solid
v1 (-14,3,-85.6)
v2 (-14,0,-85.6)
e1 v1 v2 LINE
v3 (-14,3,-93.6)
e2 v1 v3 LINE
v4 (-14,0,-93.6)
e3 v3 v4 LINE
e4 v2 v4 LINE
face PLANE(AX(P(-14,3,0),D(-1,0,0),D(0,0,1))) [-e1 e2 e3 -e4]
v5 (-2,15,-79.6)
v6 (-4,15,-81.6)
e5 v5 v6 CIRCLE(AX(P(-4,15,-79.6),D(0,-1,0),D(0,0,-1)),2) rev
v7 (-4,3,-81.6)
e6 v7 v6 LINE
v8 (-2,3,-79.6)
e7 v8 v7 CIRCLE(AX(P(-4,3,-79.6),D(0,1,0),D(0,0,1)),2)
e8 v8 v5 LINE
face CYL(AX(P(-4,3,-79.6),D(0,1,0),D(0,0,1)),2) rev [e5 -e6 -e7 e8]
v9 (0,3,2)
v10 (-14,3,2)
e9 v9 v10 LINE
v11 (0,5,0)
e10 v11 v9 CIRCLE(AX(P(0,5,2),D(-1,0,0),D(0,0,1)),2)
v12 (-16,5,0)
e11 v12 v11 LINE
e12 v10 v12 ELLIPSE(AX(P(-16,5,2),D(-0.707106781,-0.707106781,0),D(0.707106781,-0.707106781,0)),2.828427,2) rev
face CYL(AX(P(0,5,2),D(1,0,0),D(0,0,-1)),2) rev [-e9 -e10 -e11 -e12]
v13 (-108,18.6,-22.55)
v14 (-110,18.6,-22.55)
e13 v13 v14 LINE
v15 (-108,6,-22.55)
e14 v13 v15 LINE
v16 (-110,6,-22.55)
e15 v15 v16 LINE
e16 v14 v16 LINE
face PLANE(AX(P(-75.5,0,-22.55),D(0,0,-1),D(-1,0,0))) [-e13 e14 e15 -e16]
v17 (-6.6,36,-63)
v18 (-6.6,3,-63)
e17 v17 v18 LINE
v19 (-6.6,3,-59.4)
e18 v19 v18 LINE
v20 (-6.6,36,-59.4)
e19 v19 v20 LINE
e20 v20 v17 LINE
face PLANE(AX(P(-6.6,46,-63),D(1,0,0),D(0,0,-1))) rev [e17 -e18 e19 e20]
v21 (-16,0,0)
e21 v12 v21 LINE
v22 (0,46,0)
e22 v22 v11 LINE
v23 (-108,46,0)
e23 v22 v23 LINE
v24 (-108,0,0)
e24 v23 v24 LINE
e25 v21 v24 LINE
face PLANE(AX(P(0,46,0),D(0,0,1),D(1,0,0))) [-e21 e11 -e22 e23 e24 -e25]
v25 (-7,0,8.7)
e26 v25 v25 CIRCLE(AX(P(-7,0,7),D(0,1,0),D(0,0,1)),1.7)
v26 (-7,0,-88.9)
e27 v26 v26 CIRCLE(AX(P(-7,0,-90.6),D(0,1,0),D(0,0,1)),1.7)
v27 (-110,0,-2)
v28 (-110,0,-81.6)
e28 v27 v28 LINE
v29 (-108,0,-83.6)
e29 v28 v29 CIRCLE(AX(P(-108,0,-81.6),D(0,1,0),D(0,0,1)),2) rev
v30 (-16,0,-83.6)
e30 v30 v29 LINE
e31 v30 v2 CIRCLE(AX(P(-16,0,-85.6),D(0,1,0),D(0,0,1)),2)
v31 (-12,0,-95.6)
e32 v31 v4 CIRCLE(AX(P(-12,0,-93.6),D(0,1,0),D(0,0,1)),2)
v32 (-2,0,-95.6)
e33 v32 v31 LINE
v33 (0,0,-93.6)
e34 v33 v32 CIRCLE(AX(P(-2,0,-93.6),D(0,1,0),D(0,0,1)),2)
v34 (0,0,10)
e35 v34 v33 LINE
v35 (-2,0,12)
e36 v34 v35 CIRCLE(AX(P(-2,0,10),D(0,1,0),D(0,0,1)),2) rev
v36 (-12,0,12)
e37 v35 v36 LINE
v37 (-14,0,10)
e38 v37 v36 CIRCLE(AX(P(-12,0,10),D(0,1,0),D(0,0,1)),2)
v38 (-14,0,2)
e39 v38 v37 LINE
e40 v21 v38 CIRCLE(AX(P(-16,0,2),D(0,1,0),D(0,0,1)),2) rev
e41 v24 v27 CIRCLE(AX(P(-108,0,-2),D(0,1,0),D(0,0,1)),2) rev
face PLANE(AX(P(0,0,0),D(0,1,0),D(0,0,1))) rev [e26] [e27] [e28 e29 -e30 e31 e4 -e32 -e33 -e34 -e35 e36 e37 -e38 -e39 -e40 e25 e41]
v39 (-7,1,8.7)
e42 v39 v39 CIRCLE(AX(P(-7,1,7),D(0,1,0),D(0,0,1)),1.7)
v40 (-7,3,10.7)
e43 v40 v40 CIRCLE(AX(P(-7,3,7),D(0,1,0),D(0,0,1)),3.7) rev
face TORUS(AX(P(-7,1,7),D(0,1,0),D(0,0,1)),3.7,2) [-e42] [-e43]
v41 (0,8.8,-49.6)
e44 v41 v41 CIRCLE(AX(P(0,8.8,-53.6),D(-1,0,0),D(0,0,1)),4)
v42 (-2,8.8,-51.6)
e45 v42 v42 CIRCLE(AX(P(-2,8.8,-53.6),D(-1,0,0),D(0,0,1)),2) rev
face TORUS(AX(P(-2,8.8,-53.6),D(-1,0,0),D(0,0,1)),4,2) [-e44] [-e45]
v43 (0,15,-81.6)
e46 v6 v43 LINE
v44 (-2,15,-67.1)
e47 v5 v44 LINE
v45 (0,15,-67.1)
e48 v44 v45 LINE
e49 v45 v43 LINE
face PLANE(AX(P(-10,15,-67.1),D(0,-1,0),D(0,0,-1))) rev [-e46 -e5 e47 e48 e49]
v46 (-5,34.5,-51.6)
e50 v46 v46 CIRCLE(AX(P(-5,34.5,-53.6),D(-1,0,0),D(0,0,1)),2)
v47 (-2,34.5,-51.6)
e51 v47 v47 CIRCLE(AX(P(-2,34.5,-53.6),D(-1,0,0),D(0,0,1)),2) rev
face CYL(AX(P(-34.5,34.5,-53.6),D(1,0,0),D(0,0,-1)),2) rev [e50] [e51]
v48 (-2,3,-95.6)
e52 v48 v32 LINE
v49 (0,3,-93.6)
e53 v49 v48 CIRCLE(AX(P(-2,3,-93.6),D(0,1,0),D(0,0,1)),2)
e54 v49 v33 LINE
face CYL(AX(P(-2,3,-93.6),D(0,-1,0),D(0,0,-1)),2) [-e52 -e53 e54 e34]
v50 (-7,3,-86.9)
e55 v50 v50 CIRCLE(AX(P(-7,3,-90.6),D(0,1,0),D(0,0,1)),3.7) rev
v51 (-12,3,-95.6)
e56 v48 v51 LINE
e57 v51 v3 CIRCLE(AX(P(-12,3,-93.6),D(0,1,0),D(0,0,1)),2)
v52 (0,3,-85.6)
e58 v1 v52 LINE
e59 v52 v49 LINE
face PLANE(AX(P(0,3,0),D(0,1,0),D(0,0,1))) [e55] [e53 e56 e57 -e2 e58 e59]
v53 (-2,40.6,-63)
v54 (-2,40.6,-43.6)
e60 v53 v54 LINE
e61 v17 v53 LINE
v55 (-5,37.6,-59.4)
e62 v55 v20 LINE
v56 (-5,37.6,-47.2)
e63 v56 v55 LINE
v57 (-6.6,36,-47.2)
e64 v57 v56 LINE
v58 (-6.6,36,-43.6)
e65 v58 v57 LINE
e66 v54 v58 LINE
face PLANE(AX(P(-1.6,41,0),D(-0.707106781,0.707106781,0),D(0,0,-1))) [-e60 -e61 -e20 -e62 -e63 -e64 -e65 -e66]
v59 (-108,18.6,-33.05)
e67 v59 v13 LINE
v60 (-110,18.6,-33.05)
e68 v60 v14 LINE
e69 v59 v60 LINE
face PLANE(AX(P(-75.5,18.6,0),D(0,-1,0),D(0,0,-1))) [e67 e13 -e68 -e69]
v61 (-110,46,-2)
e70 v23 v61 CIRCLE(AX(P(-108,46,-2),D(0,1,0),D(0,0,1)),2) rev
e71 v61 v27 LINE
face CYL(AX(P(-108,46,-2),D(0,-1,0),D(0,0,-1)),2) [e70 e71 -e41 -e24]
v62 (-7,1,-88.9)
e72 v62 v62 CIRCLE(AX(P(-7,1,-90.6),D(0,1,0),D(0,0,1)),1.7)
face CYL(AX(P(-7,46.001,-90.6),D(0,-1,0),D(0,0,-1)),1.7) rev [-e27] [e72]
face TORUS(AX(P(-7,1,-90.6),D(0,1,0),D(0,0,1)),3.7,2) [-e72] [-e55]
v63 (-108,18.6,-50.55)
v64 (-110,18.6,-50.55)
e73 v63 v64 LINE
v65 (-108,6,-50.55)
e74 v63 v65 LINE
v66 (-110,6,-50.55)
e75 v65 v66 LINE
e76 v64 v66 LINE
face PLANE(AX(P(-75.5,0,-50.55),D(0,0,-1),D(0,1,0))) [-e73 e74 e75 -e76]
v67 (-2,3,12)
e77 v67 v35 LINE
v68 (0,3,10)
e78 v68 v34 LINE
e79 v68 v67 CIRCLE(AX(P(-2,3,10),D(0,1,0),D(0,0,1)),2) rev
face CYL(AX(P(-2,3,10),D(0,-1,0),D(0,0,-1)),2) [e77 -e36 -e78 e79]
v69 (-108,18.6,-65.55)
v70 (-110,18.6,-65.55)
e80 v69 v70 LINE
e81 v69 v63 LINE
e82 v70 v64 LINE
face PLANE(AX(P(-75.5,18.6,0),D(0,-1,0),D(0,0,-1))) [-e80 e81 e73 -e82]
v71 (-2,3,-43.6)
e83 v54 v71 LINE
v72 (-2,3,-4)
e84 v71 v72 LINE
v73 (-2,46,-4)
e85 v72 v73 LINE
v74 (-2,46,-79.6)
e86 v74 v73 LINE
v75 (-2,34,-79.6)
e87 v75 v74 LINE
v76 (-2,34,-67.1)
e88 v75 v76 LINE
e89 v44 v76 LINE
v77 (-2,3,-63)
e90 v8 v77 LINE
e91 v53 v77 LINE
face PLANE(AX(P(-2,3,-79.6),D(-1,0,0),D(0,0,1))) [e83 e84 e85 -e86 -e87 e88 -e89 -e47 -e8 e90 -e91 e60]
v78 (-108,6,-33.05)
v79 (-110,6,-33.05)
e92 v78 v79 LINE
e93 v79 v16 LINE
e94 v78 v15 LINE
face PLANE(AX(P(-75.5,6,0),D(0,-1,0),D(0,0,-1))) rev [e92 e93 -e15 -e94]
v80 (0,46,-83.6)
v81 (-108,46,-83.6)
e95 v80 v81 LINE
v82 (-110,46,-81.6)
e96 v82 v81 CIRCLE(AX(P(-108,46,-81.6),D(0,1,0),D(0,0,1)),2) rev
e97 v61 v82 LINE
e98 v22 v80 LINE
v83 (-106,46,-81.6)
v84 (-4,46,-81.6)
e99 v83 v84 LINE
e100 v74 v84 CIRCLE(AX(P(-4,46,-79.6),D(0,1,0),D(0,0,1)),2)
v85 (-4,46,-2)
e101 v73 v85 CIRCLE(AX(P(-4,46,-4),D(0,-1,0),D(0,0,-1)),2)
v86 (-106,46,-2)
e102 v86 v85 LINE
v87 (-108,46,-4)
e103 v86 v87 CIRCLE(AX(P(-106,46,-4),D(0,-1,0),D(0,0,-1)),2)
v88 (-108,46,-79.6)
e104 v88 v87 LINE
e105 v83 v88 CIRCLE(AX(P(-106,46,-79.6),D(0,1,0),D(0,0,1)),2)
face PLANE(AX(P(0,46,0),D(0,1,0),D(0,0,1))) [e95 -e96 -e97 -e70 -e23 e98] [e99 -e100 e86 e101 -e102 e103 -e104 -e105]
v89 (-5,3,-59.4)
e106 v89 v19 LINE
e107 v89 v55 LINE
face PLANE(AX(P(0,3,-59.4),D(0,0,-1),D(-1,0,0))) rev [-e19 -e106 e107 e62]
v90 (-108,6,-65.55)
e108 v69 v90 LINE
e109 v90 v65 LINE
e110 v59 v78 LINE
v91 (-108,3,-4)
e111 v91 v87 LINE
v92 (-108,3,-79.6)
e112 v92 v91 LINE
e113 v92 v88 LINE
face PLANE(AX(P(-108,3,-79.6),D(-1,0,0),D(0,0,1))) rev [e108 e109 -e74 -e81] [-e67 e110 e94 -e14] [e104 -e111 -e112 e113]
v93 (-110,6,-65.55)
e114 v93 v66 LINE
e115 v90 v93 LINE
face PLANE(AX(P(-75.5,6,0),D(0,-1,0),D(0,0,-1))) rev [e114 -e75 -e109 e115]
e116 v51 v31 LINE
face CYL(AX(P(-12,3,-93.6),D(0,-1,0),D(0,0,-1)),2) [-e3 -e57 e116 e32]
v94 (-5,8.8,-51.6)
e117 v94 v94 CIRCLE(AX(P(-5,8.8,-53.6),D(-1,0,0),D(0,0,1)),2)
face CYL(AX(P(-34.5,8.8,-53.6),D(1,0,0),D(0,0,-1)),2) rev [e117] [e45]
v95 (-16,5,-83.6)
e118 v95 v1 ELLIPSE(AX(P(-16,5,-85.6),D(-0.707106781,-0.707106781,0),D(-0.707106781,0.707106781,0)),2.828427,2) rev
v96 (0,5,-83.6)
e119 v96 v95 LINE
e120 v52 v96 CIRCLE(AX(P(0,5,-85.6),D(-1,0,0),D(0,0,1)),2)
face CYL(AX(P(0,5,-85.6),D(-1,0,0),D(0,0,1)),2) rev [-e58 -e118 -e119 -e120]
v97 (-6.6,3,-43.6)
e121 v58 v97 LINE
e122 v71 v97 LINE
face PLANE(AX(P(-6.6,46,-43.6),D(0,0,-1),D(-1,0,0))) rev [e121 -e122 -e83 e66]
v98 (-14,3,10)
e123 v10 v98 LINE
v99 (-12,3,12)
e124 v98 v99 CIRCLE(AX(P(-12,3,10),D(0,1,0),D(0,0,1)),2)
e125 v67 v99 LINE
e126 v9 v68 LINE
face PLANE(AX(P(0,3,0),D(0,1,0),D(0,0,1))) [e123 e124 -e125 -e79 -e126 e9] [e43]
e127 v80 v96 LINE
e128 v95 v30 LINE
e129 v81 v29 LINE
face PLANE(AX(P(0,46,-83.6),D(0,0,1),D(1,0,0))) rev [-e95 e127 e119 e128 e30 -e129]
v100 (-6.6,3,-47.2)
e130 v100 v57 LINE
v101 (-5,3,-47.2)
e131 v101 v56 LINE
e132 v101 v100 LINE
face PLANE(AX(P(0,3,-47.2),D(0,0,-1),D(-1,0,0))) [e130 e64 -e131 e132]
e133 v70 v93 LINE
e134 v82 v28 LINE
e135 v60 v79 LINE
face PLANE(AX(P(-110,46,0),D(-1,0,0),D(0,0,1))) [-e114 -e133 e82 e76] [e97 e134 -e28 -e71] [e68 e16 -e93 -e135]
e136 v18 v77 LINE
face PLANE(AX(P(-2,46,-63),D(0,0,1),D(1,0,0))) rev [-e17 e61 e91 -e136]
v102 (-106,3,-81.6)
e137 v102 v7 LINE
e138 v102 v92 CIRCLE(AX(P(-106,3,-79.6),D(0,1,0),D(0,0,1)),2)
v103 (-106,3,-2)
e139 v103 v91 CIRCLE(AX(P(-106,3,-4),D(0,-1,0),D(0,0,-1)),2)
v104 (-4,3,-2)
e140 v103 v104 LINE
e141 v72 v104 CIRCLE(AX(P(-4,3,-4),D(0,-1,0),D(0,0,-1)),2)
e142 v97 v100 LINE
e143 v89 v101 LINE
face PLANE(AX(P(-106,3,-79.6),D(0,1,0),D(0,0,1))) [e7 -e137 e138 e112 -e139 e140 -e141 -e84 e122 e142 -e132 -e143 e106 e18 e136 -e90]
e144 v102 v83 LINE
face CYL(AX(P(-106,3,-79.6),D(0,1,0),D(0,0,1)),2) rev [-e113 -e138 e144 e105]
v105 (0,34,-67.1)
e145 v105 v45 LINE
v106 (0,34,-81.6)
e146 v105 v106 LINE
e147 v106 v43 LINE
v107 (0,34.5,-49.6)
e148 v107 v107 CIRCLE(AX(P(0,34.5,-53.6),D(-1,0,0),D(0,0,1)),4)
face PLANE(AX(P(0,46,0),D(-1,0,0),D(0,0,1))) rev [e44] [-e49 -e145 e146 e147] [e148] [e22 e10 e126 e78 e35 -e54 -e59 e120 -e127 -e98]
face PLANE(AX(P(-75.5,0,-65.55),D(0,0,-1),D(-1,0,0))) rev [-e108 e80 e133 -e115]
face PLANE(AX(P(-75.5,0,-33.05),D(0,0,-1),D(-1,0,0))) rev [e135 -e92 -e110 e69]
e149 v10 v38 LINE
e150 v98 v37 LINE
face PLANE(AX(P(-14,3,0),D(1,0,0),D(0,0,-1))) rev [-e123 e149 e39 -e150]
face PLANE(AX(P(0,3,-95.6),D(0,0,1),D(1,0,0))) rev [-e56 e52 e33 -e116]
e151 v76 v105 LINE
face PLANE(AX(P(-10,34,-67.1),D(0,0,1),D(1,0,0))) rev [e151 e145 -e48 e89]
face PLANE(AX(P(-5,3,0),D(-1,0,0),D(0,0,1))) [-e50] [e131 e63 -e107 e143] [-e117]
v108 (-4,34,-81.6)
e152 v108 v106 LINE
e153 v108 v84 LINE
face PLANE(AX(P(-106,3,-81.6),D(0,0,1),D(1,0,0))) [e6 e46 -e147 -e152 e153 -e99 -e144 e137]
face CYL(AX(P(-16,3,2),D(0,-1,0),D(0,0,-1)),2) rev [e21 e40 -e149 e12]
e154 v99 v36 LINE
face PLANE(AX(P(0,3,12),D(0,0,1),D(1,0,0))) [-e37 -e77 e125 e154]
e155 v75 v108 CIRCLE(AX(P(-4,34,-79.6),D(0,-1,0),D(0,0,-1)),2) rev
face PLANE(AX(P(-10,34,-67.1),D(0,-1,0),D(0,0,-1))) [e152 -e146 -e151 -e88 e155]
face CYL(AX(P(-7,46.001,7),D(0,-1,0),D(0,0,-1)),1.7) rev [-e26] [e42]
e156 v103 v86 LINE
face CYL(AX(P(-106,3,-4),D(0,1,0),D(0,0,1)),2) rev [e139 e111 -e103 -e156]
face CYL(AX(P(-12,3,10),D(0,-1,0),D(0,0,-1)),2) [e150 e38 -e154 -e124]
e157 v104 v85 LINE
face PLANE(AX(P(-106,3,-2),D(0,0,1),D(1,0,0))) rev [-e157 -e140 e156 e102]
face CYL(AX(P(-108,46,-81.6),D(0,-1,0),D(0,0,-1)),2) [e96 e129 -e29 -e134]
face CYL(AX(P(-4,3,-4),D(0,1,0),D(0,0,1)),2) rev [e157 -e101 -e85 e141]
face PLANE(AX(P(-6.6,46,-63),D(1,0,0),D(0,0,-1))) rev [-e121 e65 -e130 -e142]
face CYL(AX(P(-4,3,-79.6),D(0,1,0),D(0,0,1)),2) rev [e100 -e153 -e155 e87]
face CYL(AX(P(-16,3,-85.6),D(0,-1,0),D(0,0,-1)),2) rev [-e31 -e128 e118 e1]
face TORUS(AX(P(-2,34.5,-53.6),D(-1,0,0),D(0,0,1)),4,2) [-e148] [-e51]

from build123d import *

# Parameters (mm, degrees)
BOSS_EXTRUDE1_DEPTH = 46
BOSS_EXTRUDE2_DEPTH = 3
BOSS_EXTRUDE3_DEPTH = 3
FILLET1_R           = 2
FILLET2_R           = 2
CUT_EXTRUDE5_REACH  = 154.825
SKETCH3_R           = 1.7
FILLET3_R           = 2
CUT_EXTRUDE6_DEPTH  = 43
SKETCH5_W           = 4.6
SKETCH5_H           = 19.4
BOSS_EXTRUDE4_DEPTH = 46
SKETCH6_W           = 4.6
SKETCH6_H           = 19.4
CUT_EXTRUDE8_DEPTH  = 5
SKETCH7_W           = 1.6
SKETCH7_H           = 12.2
CUT_EXTRUDE10_DEPTH = 38
CHAMFER1_SIZE       = 5
SKETCH8_R           = 2
CUT_EXTRUDE11_DEPTH = 34.5
FILLET4_R           = 2
SKETCH12_W          = 15
SKETCH12_H          = 12.6
SKETCH12_W_2        = 10.5
CUT_EXTRUDE13_DEPTH = 34.5
SKETCH14_W          = 14.5
SKETCH14_H          = 19
CUT_EXTRUDE14_DEPTH = 10


with BuildPart() as part:
    # Sketch2 → Boss-Extrude1 (new body)
    with BuildSketch(Plane(origin=(0, 0, 0), x_dir=(1, 0, 0), z_dir=(0, 1, 0))):
        with BuildLine():
            ThreePointArc((-110, 81.6), (-109.414213562, 83.014213562), (-108, 83.6))
            Line((-108, 83.6), (-16, 83.6))
            Line((-16, 83.6), (0, 83.6))
            Line((0, 83.6), (0, 0))
            Line((0, 0), (-16, 0))
            Line((-16, 0), (-108, 0))
            ThreePointArc((-108, 0), (-109.414213562, 0.585786438), (-110, 2))
            Line((-110, 2), (-110, 81.6))
        make_face()
    extrude(amount=BOSS_EXTRUDE1_DEPTH)

    # Sketch2<7> → Boss-Extrude2 (add)
    with BuildSketch(Plane(origin=(0, 0, 0), x_dir=(1, 0, 0), z_dir=(0, 1, 0))):
        with BuildLine():
            ThreePointArc((-16, 83.6), (-14.585786438, 84.185786438), (-14, 85.6))
            Line((-14, 85.6), (-14, 93.6))
            ThreePointArc((-14, 93.6), (-13.414213562, 95.014213562), (-12, 95.6))
            Line((-12, 95.6), (-2, 95.6))
            ThreePointArc((-2, 95.6), (-0.585786438, 95.014213562), (0, 93.6))
            Line((0, 93.6), (0, 83.6))
            Line((0, 83.6), (-16, 83.6))
        make_face()
    extrude(amount=BOSS_EXTRUDE2_DEPTH)

    # Sketch2<8> → Boss-Extrude3 (add)
    with BuildSketch(Plane(origin=(0, 0, 0), x_dir=(1, 0, 0), z_dir=(0, 1, 0))):
        with BuildLine():
            ThreePointArc((0, -10), (-0.585786438, -11.414213562), (-2, -12))
            Line((-2, -12), (-12, -12))
            ThreePointArc((-12, -12), (-13.414213562, -11.414213562), (-14, -10))
            Line((-14, -10), (-14, -2))
            ThreePointArc((-14, -2), (-14.585786438, -0.585786438), (-16, 0))
            Line((-16, 0), (0, 0))
            Line((0, 0), (0, -10))
        make_face()
    extrude(amount=BOSS_EXTRUDE3_DEPTH)

    # Fillet1
    fillet1_edges = [part.edges().sort_by_distance(p)[0] for p in [
        (-8, 3, -83.6),
    ]]
    fillet(fillet1_edges, radius=FILLET1_R)

    # Fillet2
    fillet2_edges = [part.edges().sort_by_distance(p)[0] for p in [
        (-8, 3, 0),
    ]]
    fillet(fillet2_edges, radius=FILLET2_R)

    # Sketch3 → Cut-Extrude5 (cut, up to next)
    with BuildSketch(Plane(origin=(0, 0, 0), x_dir=(1, 0, 0), z_dir=(0, 1, 0)), mode=Mode.PRIVATE) as cut_extrude5_sk1:
        with Locations(Location((-7, -7, 0), (0, 0, 270))):
            Circle(SKETCH3_R)
    cut_extrude5_tool1 = extrude(cut_extrude5_sk1.sketch, amount=CUT_EXTRUDE5_REACH, mode=Mode.PRIVATE) & part.part
    # Sketch3 → Cut-Extrude5 (cut, up to next)
    with BuildSketch(Plane(origin=(0, 0, 0), x_dir=(1, 0, 0), z_dir=(0, 1, 0)), mode=Mode.PRIVATE) as cut_extrude5_sk2:
        with Locations(Location((-7, 90.6, 0), (0, 0, 270))):
            Circle(SKETCH3_R)
    cut_extrude5_tool2 = extrude(cut_extrude5_sk2.sketch, amount=CUT_EXTRUDE5_REACH, mode=Mode.PRIVATE) & part.part
    add(cut_extrude5_tool1.solids().sort_by_distance((-7, 0, 7))[0], mode=Mode.SUBTRACT)
    add(cut_extrude5_tool2.solids().sort_by_distance((-7, 0, -90.6))[0], mode=Mode.SUBTRACT)

    # Fillet3
    fillet3_edges = [part.edges().sort_by_distance(p)[0] for p in [
        (-7, 3, -92.3),
        (-7, 3, 5.3),
    ]]
    fillet(fillet3_edges, radius=FILLET3_R)

    # Sketch4 → Cut-Extrude6 (cut)
    with BuildSketch(Plane(origin=(0, 46, 0), x_dir=(1, 0, 0), z_dir=(0, 1, 0))):
        with BuildLine():
            Line((-106, 81.6), (-4, 81.6))
            ThreePointArc((-4, 81.6), (-2.585786438, 81.014213562), (-2, 79.6))
            Line((-2, 79.6), (-2, 4))
            ThreePointArc((-2, 4), (-2.585786438, 2.585786438), (-4, 2))
            Line((-4, 2), (-106, 2))
            ThreePointArc((-106, 2), (-107.414213562, 2.585786438), (-108, 4))
            Line((-108, 4), (-108, 79.6))
            ThreePointArc((-108, 79.6), (-107.414213562, 81.014213562), (-106, 81.6))
        make_face()
    extrude(amount=-CUT_EXTRUDE6_DEPTH, mode=Mode.SUBTRACT)

    # Sketch5 → Boss-Extrude4 (add)
    with BuildSketch(Plane(origin=(0, 0, 0), x_dir=(1, 0, 0), z_dir=(0, 1, 0))):
        with Locations((-4.3, 53.3)):
            Rectangle(SKETCH5_W, SKETCH5_H)
    extrude(amount=BOSS_EXTRUDE4_DEPTH)

    # Sketch6 → Cut-Extrude8 (cut)
    with BuildSketch(Plane(origin=(0, 46, 0), x_dir=(1, 0, 0), z_dir=(0, 1, 0))):
        with Locations((-4.3, 53.3)):
            Rectangle(SKETCH6_W, SKETCH6_H)
    extrude(amount=-CUT_EXTRUDE8_DEPTH, mode=Mode.SUBTRACT)

    # Sketch7 → Cut-Extrude10 (cut)
    with BuildSketch(Plane(origin=(0, 41, 0), x_dir=(1, 0, 0), z_dir=(0, 1, 0))):
        with Locations((-5.8, 53.3)):
            Rectangle(SKETCH7_W, SKETCH7_H)
    extrude(amount=-CUT_EXTRUDE10_DEPTH, mode=Mode.SUBTRACT)

    # Chamfer1
    # the kernel refuses this chamfer: 5 mm, written as the material it takes off along each edge
    with BuildSketch(Plane(origin=(-6.6, 41, -46.54158506), x_dir=(0.9996219169112968, 0.027495876610586317, 0), z_dir=(0, 0, -1))) as chamfer1_piece_1_section:
        Polygon((CHAMFER1_SIZE * 0.999621916911, CHAMFER1_SIZE * 0.0274958766106), (-CHAMFER1_SIZE * 0.0274958766106, CHAMFER1_SIZE * 0.999621916911), (0, 0), align=None)
    chamfer1_piece_1 = extrude(amount=29.31682988, mode=Mode.PRIVATE)
    chamfer1_piece_1 = split(chamfer1_piece_1, bisect_by=Plane(origin=(-2, 39.327890325, -61.2), z_dir=(-1, 0, 0)), keep=Keep.TOP, mode=Mode.PRIVATE)
    add(chamfer1_piece_1, mode=Mode.SUBTRACT)
    with BuildSketch(Plane(origin=(-6.6, 41, -30.74158506), x_dir=(0.9996219169112968, 0.027495876610586317, 0), z_dir=(0, 0, -1))) as chamfer1_piece_2_section:
        Polygon((CHAMFER1_SIZE * 0.999621916911, CHAMFER1_SIZE * 0.0274958766106), (-CHAMFER1_SIZE * 0.0274958766106, CHAMFER1_SIZE * 0.999621916911), (0, 0), align=None)
    chamfer1_piece_2 = extrude(amount=29.31682988, mode=Mode.PRIVATE)
    chamfer1_piece_2 = split(chamfer1_piece_2, bisect_by=Plane(origin=(-2, 39.327890325, -45.4), z_dir=(-1, 0, 0)), keep=Keep.TOP, mode=Mode.PRIVATE)
    add(chamfer1_piece_2, mode=Mode.SUBTRACT)

    # Sketch8 → Cut-Extrude11 (cut)
    with BuildSketch(Plane(origin=(0, 0, 0), x_dir=(0, 0, -1), z_dir=(1, 0, 0))):
        with Locations((53.6, 8.8)):
            Circle(SKETCH8_R)
        with Locations((53.6, 34.5)):
            Circle(SKETCH8_R)
    extrude(amount=-CUT_EXTRUDE11_DEPTH, mode=Mode.SUBTRACT)

    # Fillet4
    fillet4_edges = [part.edges().sort_by_distance(p)[0] for p in [
        (0, 8.8, -51.6),
        (0, 34.5, -51.6),
    ]]
    fillet(fillet4_edges, radius=FILLET4_R)

    # Sketch12 → Cut-Extrude13 (cut)
    with BuildSketch(Plane.ZY.offset(110)):
        with Locations((-58.05, 12.3)):
            Rectangle(SKETCH12_W, SKETCH12_H)
        with Locations((-27.8, 12.3)):
            Rectangle(SKETCH12_W_2, SKETCH12_H)
    extrude(amount=-CUT_EXTRUDE13_DEPTH, mode=Mode.SUBTRACT)

    # Sketch14 → Cut-Extrude14 (cut)
    with BuildSketch(Plane(origin=(0, 0, 0), x_dir=(0, 0, -1), z_dir=(1, 0, 0))):
        with Locations((74.35, 24.5)):
            Rectangle(SKETCH14_W, SKETCH14_H)
    extrude(amount=-CUT_EXTRUDE14_DEPTH, mode=Mode.SUBTRACT)


solid = part.part
